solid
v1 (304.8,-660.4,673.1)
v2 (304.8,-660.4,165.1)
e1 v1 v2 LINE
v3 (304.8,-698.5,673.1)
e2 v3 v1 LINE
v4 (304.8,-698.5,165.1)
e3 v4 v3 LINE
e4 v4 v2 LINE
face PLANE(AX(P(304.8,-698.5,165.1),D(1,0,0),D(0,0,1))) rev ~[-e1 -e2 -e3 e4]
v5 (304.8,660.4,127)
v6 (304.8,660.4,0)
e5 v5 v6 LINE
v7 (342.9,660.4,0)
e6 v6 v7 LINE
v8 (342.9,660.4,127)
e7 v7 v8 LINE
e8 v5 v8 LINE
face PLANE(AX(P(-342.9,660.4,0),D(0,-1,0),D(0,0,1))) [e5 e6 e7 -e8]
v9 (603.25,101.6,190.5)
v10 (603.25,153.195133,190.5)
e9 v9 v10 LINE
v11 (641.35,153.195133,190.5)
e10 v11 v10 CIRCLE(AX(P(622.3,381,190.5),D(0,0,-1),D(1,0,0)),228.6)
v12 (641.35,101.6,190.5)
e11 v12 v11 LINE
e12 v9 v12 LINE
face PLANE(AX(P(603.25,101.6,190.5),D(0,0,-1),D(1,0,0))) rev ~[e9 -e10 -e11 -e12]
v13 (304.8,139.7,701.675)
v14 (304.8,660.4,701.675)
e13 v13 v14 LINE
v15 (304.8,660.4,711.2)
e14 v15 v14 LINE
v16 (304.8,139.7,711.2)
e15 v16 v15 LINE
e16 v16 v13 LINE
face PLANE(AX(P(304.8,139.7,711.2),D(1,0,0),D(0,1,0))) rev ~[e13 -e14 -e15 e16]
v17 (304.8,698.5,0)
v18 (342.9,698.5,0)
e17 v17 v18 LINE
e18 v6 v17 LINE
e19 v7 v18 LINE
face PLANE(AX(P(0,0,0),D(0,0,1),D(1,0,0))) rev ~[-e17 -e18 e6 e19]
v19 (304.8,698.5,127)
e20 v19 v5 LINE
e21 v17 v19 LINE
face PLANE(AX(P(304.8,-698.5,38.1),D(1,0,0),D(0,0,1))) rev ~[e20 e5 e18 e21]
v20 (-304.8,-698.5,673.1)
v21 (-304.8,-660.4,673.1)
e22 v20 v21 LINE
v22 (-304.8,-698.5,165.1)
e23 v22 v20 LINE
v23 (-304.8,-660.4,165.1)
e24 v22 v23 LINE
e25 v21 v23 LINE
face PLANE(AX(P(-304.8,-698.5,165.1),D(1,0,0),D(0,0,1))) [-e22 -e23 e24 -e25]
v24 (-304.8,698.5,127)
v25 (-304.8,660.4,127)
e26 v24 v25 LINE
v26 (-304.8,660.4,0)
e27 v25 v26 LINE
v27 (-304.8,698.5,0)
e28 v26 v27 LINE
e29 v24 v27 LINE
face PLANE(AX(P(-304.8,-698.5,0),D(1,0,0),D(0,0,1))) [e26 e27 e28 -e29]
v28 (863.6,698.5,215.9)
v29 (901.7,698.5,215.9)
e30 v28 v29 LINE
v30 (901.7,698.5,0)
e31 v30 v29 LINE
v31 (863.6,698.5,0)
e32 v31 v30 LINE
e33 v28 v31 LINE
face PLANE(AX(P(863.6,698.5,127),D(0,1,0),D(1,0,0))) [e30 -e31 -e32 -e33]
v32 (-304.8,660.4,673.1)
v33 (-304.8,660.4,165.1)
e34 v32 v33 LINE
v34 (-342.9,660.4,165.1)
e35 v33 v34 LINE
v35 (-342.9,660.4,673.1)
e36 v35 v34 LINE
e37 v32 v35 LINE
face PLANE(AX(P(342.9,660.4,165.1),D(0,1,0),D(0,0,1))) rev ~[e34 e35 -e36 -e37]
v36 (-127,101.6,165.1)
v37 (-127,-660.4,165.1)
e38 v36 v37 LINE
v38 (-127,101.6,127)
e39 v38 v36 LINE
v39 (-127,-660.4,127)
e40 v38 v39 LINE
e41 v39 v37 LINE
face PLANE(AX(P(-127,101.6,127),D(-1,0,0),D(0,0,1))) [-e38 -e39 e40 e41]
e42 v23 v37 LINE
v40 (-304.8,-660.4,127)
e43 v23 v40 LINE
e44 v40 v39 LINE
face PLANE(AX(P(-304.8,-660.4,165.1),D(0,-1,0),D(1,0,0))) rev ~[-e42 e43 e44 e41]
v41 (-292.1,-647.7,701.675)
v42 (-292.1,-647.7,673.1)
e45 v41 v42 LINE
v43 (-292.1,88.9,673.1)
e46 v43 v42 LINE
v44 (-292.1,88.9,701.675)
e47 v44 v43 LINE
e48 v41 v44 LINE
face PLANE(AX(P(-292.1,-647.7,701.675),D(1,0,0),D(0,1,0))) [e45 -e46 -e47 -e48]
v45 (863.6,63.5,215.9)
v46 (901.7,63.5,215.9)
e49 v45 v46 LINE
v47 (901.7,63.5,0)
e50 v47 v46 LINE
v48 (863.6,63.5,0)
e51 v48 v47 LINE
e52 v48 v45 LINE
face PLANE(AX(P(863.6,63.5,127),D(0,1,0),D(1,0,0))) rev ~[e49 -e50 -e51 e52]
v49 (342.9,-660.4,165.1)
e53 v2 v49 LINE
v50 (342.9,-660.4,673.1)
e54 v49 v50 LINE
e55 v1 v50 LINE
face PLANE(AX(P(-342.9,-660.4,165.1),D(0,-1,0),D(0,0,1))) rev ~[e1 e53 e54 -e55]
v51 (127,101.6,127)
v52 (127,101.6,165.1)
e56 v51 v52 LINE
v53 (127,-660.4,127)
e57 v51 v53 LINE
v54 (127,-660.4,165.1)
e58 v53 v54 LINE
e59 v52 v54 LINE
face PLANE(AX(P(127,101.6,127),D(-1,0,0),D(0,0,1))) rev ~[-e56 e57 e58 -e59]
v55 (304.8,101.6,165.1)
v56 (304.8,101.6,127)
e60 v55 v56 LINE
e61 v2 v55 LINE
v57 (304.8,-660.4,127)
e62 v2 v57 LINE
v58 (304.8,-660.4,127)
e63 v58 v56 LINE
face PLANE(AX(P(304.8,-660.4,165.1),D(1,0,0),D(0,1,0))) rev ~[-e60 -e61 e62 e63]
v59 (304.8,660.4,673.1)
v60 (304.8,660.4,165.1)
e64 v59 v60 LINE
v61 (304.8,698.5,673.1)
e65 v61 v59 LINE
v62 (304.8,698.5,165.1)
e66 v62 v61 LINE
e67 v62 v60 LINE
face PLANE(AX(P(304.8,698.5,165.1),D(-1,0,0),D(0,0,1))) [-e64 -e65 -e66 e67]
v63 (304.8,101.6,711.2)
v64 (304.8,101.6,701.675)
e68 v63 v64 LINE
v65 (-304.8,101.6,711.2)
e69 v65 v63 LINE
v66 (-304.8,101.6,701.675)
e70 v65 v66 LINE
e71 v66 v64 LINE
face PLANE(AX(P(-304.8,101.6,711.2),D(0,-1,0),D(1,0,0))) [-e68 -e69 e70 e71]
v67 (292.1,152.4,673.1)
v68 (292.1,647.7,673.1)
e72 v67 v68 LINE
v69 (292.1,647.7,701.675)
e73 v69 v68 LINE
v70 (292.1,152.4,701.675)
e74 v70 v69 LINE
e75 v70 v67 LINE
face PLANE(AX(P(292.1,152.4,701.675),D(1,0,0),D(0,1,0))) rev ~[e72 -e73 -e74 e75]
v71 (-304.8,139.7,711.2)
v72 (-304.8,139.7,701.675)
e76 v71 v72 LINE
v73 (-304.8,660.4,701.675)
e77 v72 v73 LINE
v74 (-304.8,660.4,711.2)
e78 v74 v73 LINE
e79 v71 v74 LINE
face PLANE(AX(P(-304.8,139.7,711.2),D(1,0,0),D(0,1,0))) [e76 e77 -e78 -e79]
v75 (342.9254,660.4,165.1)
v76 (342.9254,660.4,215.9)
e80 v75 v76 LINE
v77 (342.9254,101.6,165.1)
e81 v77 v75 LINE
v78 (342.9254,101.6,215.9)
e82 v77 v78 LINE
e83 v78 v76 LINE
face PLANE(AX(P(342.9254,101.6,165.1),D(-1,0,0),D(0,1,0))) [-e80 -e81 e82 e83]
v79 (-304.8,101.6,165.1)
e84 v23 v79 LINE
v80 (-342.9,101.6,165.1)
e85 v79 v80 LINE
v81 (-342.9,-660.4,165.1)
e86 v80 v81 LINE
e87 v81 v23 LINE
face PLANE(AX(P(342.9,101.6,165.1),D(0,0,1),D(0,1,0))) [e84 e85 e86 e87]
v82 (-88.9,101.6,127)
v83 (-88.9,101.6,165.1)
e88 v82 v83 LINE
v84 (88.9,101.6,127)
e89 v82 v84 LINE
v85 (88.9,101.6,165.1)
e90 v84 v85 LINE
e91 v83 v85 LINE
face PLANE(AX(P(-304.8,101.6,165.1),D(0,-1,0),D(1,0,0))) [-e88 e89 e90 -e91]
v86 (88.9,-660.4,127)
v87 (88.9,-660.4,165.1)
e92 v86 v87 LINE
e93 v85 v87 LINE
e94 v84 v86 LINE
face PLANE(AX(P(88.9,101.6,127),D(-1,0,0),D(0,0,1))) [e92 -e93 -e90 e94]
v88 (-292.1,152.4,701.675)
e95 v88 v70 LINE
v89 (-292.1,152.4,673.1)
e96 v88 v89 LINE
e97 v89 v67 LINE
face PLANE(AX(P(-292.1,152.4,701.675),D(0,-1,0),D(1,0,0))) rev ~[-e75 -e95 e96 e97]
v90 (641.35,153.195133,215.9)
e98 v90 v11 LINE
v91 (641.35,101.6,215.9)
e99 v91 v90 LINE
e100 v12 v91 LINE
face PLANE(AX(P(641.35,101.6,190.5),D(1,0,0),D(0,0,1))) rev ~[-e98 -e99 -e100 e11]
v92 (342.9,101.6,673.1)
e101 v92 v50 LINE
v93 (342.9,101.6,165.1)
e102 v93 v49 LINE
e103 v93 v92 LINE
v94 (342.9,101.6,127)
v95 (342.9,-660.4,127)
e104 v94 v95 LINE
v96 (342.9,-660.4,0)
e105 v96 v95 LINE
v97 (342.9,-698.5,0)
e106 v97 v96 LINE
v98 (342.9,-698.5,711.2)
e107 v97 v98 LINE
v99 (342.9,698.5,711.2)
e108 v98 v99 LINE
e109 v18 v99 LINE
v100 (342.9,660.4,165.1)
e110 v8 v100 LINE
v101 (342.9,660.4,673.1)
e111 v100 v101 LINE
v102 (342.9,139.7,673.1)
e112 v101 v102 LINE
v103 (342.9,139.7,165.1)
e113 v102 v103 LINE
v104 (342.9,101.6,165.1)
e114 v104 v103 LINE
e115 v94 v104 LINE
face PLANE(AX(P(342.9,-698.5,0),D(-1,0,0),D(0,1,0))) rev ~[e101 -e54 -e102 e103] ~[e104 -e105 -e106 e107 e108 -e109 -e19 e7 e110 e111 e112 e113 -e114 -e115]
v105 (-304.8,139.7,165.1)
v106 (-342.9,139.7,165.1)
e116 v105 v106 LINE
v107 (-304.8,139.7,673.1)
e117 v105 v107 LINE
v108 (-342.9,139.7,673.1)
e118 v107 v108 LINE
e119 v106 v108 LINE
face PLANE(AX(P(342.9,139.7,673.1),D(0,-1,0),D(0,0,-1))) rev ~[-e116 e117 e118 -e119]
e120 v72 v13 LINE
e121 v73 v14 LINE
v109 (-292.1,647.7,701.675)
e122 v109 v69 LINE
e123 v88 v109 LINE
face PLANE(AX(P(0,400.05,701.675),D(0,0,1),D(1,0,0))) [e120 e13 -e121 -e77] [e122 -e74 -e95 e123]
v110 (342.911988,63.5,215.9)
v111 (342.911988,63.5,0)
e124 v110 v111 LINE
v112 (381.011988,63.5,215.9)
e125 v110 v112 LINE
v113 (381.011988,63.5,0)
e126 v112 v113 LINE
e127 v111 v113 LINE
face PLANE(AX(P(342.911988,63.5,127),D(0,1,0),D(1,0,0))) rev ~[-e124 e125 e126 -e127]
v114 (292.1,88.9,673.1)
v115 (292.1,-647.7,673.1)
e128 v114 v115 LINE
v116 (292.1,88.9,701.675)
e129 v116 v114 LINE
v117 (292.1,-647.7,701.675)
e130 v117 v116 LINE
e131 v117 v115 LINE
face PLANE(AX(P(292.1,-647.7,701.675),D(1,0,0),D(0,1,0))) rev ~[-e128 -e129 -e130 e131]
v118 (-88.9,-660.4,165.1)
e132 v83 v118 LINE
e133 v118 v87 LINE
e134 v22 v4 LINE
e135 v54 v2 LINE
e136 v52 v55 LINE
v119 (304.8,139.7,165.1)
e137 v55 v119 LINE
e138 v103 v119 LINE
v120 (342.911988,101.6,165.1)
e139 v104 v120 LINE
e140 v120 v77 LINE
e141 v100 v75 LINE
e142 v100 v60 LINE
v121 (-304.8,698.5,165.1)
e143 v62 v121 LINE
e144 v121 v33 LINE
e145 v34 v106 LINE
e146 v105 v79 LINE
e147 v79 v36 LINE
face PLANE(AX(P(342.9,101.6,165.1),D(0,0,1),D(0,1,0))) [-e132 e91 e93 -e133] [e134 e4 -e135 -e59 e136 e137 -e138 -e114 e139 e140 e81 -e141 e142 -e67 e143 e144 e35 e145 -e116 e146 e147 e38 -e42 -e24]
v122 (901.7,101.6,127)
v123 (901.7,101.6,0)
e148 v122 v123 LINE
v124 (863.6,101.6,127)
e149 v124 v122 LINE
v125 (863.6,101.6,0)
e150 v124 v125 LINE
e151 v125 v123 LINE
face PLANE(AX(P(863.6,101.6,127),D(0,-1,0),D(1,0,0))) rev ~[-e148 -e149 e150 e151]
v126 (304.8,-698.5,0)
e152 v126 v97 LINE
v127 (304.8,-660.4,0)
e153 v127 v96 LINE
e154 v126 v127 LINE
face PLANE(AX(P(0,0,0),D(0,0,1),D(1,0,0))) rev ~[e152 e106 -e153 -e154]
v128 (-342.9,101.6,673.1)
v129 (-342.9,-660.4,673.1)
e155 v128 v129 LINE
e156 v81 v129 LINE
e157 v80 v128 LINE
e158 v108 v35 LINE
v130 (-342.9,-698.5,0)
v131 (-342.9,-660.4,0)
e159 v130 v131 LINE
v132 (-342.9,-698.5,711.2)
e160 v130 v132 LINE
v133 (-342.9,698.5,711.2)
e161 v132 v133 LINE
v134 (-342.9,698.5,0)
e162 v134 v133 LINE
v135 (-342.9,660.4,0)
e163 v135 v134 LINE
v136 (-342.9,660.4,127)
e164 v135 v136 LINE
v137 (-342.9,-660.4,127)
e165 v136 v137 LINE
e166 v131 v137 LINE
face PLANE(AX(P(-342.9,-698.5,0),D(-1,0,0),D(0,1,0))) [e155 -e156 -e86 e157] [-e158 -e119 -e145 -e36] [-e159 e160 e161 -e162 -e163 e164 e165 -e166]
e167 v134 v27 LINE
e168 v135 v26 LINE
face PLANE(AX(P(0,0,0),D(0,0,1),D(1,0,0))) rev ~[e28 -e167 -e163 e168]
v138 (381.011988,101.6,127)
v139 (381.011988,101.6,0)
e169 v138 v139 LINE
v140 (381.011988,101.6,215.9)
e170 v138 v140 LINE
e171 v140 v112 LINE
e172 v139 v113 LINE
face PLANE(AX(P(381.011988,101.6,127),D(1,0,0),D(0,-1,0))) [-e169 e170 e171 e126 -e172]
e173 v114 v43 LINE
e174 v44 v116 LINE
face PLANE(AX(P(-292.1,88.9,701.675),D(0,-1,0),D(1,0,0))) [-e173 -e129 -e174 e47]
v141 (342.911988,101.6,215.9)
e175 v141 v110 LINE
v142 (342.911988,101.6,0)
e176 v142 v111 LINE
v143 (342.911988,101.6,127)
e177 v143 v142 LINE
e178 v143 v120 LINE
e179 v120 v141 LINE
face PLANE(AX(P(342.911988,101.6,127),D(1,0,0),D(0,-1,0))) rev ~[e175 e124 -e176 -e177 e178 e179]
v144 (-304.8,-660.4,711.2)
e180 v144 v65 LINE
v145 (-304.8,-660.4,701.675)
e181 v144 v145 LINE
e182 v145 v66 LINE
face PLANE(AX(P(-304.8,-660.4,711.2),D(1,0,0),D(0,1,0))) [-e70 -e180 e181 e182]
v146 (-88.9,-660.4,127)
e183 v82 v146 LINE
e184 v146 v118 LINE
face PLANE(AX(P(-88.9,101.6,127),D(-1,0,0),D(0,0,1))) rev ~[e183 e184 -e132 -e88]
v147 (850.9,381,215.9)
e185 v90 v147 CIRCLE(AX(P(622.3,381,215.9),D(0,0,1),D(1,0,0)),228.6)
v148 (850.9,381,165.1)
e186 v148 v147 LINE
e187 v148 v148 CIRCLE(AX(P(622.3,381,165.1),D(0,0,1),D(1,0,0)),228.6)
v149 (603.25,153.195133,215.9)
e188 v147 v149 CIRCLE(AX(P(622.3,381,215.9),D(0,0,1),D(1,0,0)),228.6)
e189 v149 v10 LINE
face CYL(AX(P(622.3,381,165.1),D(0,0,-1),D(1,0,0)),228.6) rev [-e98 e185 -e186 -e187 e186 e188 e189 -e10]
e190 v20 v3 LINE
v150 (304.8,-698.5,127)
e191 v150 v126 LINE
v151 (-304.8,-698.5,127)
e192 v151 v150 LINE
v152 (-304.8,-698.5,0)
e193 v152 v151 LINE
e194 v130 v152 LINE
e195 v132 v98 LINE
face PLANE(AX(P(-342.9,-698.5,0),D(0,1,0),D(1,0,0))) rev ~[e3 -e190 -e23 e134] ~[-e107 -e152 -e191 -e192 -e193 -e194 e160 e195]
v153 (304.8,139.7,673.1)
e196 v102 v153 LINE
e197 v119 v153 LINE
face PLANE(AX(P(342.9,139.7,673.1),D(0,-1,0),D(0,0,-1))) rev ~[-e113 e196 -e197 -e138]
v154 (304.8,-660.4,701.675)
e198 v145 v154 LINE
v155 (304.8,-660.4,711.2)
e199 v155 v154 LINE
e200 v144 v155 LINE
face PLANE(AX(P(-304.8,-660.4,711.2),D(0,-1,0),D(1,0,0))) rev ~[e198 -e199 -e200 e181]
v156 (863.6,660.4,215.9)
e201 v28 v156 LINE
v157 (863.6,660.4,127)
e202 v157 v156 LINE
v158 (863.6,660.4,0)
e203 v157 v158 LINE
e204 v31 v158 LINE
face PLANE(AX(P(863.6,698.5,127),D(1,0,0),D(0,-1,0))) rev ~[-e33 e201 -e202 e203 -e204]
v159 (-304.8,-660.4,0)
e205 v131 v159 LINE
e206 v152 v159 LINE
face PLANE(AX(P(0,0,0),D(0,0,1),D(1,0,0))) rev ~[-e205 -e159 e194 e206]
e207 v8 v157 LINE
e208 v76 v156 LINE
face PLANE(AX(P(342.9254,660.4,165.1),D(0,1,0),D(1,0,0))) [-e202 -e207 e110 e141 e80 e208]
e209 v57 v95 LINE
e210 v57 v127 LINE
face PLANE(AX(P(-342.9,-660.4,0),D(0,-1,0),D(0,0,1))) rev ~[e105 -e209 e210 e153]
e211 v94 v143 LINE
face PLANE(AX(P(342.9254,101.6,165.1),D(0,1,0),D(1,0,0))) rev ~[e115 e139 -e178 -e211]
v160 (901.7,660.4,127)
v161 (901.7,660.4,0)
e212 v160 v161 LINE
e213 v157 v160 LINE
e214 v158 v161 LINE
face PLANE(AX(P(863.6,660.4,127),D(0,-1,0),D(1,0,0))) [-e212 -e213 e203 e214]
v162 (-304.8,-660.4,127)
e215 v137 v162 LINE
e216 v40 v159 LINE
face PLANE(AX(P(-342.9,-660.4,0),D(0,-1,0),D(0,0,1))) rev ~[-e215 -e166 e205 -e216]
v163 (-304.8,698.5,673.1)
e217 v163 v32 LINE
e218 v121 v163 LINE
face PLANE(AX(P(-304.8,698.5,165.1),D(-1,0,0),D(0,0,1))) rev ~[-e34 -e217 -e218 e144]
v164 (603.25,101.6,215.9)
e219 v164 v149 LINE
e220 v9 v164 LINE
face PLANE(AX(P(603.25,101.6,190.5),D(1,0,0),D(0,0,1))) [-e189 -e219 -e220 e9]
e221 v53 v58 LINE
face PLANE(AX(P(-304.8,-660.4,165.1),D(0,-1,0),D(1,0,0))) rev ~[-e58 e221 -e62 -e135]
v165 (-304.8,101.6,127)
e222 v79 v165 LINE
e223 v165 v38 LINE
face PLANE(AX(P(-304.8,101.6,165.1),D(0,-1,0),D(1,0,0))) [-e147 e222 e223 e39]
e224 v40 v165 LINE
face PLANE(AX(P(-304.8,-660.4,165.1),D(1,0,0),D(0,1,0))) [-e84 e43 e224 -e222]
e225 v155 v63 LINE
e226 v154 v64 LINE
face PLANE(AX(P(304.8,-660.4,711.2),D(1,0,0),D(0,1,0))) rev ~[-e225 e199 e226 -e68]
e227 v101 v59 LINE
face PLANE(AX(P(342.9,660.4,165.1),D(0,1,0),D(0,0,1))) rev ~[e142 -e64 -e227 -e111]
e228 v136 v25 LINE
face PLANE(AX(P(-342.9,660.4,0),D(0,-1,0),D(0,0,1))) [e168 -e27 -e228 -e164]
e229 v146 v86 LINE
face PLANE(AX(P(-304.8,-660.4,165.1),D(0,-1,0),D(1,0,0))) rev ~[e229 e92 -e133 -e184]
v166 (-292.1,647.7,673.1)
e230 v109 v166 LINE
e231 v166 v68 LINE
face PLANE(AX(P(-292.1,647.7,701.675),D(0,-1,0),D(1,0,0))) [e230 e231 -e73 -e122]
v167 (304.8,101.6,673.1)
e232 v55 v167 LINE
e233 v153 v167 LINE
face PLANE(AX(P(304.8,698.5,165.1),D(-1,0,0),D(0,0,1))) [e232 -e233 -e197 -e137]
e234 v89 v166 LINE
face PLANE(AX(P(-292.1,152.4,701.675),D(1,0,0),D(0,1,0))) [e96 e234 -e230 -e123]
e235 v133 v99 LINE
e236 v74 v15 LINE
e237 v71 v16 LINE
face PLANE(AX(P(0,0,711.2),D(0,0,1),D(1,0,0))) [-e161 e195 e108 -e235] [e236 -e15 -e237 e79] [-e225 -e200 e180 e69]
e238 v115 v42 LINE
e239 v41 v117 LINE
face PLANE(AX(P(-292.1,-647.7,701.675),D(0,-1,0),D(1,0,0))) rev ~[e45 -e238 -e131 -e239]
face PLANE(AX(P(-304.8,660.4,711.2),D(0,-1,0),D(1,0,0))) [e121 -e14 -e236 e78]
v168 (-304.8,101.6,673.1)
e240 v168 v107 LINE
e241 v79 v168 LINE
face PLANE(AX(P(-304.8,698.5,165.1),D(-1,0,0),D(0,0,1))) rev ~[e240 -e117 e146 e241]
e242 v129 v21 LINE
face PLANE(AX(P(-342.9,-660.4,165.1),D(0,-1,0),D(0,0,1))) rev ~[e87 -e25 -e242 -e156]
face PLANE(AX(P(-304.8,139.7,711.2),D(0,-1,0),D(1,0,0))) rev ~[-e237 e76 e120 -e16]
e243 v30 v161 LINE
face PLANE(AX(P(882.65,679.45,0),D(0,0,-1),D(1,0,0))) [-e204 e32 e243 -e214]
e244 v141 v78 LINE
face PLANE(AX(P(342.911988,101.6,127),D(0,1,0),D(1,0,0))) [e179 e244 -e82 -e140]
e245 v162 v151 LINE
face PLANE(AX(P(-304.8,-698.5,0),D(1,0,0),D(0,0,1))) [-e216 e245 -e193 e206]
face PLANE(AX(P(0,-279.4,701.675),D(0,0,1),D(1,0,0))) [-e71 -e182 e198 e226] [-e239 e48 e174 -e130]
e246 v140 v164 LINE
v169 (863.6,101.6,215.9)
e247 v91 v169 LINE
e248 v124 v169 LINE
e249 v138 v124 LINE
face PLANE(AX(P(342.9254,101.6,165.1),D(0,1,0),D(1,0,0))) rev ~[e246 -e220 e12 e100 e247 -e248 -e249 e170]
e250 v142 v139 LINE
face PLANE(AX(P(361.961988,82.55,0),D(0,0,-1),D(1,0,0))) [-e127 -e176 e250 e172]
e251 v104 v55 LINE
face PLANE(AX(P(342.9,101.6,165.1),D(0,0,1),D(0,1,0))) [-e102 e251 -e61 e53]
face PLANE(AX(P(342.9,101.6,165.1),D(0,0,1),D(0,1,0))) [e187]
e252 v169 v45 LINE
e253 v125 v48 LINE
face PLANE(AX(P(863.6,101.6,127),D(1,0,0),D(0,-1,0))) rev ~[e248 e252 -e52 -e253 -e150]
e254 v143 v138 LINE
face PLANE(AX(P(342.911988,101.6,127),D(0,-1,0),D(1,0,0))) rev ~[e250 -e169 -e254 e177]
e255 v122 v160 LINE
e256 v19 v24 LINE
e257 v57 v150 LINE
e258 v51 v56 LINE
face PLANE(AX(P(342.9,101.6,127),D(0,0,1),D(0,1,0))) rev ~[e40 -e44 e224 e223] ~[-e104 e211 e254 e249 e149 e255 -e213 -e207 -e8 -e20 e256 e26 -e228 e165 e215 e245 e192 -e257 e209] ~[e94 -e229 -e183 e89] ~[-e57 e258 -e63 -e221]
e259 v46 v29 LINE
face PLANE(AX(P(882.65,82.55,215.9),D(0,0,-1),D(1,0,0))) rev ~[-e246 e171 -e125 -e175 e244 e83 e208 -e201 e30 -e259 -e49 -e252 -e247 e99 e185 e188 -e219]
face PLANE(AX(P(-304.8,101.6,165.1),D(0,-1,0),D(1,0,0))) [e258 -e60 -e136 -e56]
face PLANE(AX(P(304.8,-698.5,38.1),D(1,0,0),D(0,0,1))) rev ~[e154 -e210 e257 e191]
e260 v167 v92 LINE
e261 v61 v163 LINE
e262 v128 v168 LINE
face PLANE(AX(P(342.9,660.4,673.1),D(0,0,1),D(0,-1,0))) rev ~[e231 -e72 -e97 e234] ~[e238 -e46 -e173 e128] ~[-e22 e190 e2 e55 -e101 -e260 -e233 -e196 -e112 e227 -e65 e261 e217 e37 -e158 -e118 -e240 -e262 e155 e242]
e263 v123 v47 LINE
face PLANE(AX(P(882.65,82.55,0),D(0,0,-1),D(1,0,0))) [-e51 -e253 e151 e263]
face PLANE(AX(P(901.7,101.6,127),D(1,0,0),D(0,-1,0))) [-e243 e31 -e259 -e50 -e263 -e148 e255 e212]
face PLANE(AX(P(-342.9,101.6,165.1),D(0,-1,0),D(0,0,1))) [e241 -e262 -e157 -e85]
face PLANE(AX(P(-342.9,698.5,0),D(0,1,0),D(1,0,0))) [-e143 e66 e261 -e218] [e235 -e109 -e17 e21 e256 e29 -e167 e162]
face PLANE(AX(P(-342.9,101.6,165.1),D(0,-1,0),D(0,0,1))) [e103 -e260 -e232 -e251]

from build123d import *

# Parameters (mm, degrees)
F0_W           = 685.8
F0_H           = 1397
F1_DEPTH       = 711.2
F2_W           = 609.6
F2_H           = 508
F2_H_2         = 88.9
F3_DEPTH       = 800.1
F4_W           = 609.6
F4_H           = 88.9
F5_DEPTH       = 596.901
F6_W           = 609.6
F6_H           = 762
F7_DEPTH       = 9.525
F8_W           = 584.2
F8_H           = 736.6
F9_DEPTH       = 50.8
F10_W          = 609.6
F10_H          = 38.1
F11_DEPTH      = 1397.001
F12_W          = 762
F12_H          = 508
F12_W_2        = 1320.8
F12_H_2        = 127
F13_DEPTH      = 685.801
F14_W          = 609.6
F14_H          = 508
F15_DEPTH      = 584.2
F16_W          = 609.6
F16_H          = 520.7
F17_DEPTH      = 9.525
F18_W          = 584.2
F18_H          = 495.3
F19_DEPTH      = 28.575
F21_DEPTH      = 685.801
F22_W          = 558.8
F22_H          = 38.1
F23_DEPTH      = 558.8
F24_W          = 558.7746
F24_H          = 558.8
F24_R          = 228.6
F25_DEPTH      = 50.8
F26_W          = 38.1
F26_H          = 25.4
F27_DEPTH      = 52.5951328439
F28_W          = 38.1
F28_H          = 38.1
F29_DEPTH      = 127
F29_DEPTH_BACK = 88.9
F30_W          = 609.6
F30_H          = 508
F31_DEPTH      = 12.7
F32_W          = 609.6
F32_H          = 762
F33_DEPTH      = 165.101
F34_W          = 38.1
F34_H          = 38.1
F35_DEPTH      = 762


# Not quite as in the source:
# - a length typed as a fraction of an inch, garbled in the dataset ("3 / 203.2 mm" for 3/8 in), is restored


with BuildPart() as f1:
    # F0 (on Top) → F1 (new body)
    with BuildSketch(Plane.XY):
        Rectangle(F0_W, F0_H)
    extrude(amount=F1_DEPTH)

    # F2 (on face) → F3 (cut)
    with BuildSketch(Plane.XZ.offset(698.5)):
        with Locations((0, 419.1)):
            Rectangle(F2_W, F2_H)
        with Locations((0, 82.55)):
            Rectangle(F2_W, F2_H_2)
    extrude(amount=-F3_DEPTH, mode=Mode.SUBTRACT)

    # F4 (on face) → F5 (cut, through all)
    with BuildSketch(Plane.XZ.offset(-101.6)):
        with Locations((0, 82.55)):
            Rectangle(F4_W, F4_H)
    extrude(amount=-F5_DEPTH, mode=Mode.SUBTRACT)

    # F6 (on face) → F7 (cut)
    with BuildSketch(Plane.XY.offset(711.2)):
        with Locations((0, -279.4)):
            Rectangle(F6_W, F6_H)
    extrude(amount=-F7_DEPTH, mode=Mode.SUBTRACT)

    # F8 (on face) → F9 (cut)
    with BuildSketch(Plane.XY.offset(701.675)):
        with Locations((0, -279.4)):
            Rectangle(F8_W, F8_H)
    extrude(amount=-F9_DEPTH, mode=Mode.SUBTRACT)

    # F10 (on face) → F11 (cut, through all)
    with BuildSketch(Plane.XZ.offset(698.5)):
        with Locations((0, 19.05)):
            Rectangle(F10_W, F10_H)
    extrude(amount=-F11_DEPTH, mode=Mode.SUBTRACT)

    # F12 (on face) → F13 (cut, through all)
    with BuildSketch(Plane(origin=(-342.9, 0, 0), x_dir=(0, -1, 0), z_dir=(-1, 0, 0))):
        with Locations((279.4, 419.1)):
            Rectangle(F12_W, F12_H)
        with Locations((0, 63.5)):
            Rectangle(F12_W_2, F12_H_2)
    extrude(amount=-F13_DEPTH, mode=Mode.SUBTRACT)

    # F14 (on face) → F15 (cut)
    with BuildSketch(Plane(origin=(0, 698.5, 0), x_dir=(-1, 0, 0), z_dir=(0, 1, 0))):
        with Locations((0, 419.1)):
            Rectangle(F14_W, F14_H)
    extrude(amount=-F15_DEPTH, mode=Mode.SUBTRACT)

    # F16 (on face) → F17 (cut)
    with BuildSketch(Plane.XY.offset(711.2)):
        with Locations((0, 400.05)):
            Rectangle(F16_W, F16_H)
    extrude(amount=-F17_DEPTH, mode=Mode.SUBTRACT)

    # F18 (on face) → F19 (cut, through all)
    with BuildSketch(Plane.XY.offset(701.675)):
        with Locations((0, 400.05)):
            Rectangle(F18_W, F18_H)
    extrude(amount=-F19_DEPTH, mode=Mode.SUBTRACT)

    # F20 (on face) → F21 (cut, through all)
    with BuildSketch(Plane.YZ.offset(342.9)):
        Polygon((660.4, 673.1), (647.7, 673.1), (152.4, 673.1), (139.7, 673.1), (139.7, 165.1), (660.4, 165.1), align=None)
    extrude(amount=-F21_DEPTH, mode=Mode.SUBTRACT)

    # F22 (on face) → F23 (join)
    with BuildSketch(Plane.YZ.offset(342.9)):
        with Locations((381, 146.05)):
            Rectangle(F22_W, F22_H)
    extrude(amount=F23_DEPTH)

    # F24 (on face) → F25 (join)
    with BuildSketch(Plane.XY.offset(165.1)):
        with Locations((622.3127, 381)):
            Rectangle(F24_W, F24_H)
        with Locations((622.3, 381)):
            Circle(F24_R, mode=Mode.SUBTRACT)
    extrude(amount=F25_DEPTH)

    # F26 (on face) → F27 (cut, up to face)
    with BuildSketch(Plane.XZ.offset(-101.6)):
        with Locations((622.3, 203.2)):
            Rectangle(F26_W, F26_H)
    extrude(amount=-F27_DEPTH, mode=Mode.SUBTRACT)

    # F28 (on face) → F29 (join, two sides)
    with BuildSketch(Plane(origin=(0, 0, 127), x_dir=(1, 0, 0), z_dir=(0, 0, -1))) as f29_sk:
        with Locations((882.65, -82.55)):
            Rectangle(F28_W, F28_H)
        with Locations((882.65, -679.45)):
            Rectangle(F28_W, F28_H)
        with Locations((361.9619884968, -82.55)):
            Rectangle(F28_W, F28_H)
    extrude(amount=F29_DEPTH)
    extrude(f29_sk.sketch, amount=-F29_DEPTH_BACK)

    # F30 (on face) → F31 (cut, through all)
    with BuildSketch(Plane(origin=(0, 114.3, 0), x_dir=(-1, 0, 0), z_dir=(0, 1, 0))):
        with Locations((0, 419.1)):
            Rectangle(F30_W, F30_H)
    extrude(amount=-F31_DEPTH, mode=Mode.SUBTRACT)

    # F32 (on face) → F33 (cut, through all)
    with BuildSketch(Plane.XY.offset(165.1)):
        with Locations((0, -279.4)):
            Rectangle(F32_W, F32_H)
    extrude(amount=-F33_DEPTH, mode=Mode.SUBTRACT)

    # F34 (on face) → F35 (join, through all)
    with BuildSketch(Plane.XZ.offset(-101.6)):
        with Locations((107.95, 146.05)):
            Rectangle(F34_W, F34_H)
        with Locations((-107.95, 146.05)):
            Rectangle(F34_W, F34_H)
    extrude(amount=F35_DEPTH)


solid = f1.part
